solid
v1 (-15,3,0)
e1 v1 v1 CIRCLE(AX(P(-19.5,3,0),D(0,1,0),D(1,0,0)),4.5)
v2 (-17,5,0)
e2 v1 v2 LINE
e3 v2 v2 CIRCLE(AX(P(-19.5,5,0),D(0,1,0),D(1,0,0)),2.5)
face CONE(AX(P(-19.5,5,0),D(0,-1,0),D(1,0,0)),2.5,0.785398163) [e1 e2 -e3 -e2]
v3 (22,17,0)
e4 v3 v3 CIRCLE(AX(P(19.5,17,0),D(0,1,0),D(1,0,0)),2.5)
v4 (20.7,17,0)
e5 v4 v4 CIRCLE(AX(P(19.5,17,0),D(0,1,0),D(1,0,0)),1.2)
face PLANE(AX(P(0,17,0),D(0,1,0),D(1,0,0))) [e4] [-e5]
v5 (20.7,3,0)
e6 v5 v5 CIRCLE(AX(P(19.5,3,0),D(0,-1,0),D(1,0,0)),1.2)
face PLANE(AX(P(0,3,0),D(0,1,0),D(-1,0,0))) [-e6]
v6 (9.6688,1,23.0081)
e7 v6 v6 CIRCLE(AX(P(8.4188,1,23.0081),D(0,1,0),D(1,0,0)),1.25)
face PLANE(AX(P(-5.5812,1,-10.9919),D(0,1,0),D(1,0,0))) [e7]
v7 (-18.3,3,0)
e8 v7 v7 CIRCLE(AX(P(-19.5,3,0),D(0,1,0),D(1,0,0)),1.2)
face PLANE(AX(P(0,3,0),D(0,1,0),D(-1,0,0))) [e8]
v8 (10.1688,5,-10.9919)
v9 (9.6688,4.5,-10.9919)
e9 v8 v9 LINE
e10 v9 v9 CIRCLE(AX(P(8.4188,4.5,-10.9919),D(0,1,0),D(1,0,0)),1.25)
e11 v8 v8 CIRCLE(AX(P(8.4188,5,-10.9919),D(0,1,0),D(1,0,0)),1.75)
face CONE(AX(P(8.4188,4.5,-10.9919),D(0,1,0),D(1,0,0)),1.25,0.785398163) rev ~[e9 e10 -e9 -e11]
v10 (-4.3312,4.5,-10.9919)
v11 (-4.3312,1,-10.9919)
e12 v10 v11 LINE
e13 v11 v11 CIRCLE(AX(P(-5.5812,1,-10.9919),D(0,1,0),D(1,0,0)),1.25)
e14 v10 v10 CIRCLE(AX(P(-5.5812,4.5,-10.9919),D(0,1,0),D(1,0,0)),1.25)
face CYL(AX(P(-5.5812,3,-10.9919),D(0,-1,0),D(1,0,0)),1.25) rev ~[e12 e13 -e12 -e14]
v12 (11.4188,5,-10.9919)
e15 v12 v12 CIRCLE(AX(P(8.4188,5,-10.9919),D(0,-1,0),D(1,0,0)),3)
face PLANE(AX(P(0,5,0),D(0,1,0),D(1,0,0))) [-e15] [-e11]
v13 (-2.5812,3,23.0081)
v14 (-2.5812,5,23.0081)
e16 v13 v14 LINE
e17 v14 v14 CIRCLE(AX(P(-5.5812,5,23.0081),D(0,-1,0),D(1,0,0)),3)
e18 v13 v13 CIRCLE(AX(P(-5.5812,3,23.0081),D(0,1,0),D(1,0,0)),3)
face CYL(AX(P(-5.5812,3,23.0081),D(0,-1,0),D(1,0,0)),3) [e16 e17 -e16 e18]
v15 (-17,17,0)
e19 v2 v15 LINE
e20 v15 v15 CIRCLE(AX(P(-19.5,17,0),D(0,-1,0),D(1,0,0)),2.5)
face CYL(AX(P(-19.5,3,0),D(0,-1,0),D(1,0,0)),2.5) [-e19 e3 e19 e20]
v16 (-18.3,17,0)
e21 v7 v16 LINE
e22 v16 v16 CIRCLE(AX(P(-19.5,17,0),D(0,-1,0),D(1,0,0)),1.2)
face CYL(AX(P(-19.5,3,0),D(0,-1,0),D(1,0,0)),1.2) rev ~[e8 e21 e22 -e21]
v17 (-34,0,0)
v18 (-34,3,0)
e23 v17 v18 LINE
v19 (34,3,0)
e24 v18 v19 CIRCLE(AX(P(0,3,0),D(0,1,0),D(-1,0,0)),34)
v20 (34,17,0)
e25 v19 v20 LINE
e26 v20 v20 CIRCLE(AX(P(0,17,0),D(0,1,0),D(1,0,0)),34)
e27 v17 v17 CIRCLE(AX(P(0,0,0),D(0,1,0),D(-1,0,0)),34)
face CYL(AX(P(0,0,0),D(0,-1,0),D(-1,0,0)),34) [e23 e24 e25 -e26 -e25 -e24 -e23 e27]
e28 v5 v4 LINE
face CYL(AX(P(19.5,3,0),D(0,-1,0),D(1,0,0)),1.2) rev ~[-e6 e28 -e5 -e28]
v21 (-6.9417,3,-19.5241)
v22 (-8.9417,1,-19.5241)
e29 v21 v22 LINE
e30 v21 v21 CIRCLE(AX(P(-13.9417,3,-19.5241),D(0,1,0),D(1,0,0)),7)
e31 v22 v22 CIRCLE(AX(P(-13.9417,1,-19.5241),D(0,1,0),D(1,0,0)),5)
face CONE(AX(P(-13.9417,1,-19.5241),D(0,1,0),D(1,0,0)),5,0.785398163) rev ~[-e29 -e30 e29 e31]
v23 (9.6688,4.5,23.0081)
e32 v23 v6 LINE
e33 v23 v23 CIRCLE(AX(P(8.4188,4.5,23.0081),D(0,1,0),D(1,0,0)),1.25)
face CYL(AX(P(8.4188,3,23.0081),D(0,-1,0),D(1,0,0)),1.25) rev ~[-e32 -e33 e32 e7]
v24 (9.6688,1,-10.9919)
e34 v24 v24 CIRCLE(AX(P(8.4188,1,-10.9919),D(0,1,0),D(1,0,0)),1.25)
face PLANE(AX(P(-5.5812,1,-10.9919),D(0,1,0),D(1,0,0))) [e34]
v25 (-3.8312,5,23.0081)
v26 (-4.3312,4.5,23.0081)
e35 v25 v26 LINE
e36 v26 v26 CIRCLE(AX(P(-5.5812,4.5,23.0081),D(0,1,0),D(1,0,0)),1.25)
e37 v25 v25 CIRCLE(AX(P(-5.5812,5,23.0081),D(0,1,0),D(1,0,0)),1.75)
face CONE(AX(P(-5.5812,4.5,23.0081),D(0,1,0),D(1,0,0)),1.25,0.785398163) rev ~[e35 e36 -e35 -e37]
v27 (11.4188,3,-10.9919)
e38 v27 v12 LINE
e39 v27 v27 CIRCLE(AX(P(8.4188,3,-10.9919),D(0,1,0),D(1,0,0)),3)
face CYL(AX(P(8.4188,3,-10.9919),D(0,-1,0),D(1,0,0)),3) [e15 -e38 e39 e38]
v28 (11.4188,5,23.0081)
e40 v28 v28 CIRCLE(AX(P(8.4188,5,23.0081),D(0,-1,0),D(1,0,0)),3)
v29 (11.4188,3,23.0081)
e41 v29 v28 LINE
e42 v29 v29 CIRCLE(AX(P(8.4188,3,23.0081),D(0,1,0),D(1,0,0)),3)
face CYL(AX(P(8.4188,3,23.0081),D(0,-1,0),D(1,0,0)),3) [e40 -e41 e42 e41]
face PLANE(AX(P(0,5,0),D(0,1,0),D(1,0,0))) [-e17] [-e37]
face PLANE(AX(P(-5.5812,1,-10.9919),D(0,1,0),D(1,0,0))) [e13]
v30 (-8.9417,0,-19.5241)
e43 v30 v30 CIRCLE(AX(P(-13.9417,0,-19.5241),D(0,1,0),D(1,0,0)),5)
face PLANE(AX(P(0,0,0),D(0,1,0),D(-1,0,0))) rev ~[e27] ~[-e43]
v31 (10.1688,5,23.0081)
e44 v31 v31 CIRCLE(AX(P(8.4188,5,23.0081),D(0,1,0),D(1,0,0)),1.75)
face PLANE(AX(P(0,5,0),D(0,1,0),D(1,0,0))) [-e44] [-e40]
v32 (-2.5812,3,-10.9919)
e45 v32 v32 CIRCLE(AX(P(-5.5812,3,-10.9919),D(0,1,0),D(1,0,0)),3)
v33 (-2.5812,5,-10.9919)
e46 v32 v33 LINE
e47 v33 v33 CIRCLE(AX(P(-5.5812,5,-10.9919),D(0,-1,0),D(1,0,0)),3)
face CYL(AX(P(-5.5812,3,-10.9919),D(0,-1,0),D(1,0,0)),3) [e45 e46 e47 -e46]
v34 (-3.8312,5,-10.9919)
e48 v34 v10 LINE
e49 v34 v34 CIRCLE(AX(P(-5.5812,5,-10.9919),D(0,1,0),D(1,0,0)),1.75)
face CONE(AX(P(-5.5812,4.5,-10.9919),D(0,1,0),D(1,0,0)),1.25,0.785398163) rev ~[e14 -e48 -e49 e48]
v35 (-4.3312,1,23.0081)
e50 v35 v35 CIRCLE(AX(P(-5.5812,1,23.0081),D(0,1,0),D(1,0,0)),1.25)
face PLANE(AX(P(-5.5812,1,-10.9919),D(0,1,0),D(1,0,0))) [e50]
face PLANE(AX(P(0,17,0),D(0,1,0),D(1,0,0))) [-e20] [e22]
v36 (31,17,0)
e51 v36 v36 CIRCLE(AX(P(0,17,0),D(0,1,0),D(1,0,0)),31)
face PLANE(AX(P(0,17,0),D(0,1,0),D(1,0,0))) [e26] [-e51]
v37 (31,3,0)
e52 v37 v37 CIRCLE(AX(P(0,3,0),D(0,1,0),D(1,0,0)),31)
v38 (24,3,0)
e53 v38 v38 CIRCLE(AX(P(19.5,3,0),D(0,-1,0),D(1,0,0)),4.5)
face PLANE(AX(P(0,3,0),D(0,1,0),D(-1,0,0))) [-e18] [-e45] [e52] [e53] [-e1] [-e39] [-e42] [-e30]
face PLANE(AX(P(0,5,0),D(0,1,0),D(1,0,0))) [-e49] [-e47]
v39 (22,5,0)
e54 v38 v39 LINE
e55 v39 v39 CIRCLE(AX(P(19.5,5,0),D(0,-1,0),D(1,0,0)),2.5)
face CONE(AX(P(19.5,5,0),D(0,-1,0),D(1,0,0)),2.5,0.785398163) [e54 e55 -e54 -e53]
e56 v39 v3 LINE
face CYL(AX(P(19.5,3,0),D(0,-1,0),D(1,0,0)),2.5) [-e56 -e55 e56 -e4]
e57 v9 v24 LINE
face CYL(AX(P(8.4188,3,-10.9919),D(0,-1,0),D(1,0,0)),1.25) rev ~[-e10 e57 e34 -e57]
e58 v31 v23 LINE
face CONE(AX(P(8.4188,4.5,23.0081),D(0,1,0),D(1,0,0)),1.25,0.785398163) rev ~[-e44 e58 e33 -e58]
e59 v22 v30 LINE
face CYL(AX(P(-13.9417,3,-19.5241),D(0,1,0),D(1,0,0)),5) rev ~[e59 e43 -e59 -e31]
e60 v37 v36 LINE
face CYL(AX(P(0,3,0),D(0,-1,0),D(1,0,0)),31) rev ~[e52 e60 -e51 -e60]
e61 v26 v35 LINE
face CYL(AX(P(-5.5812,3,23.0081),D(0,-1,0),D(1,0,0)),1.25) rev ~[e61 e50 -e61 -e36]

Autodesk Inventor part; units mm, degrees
ref_plane "YZ Plane" through (0, 0, 0) normal (1, 0, 0) x (0, 1, 0)
ref_plane "XZ Plane" through (0, 0, 0) normal (0, 1, 0) x (-1, 0, 0)
ref_plane "XY Plane" through (0, 0, 0) normal (0, 0, 1) x (1, 0, 0)
sketch "Sketch1" plane through (0, 0, 0) normal (0, 1, 0) x (-1, 0, 0)
  circle A0 centre (0, 0) radius 34
  dimension "d0" = 68
extrude "Extrusion1" add sketch "Sketch1" along normal blind 3
sketch "Sketch2" plane through (0, 3, 0) normal (0, 1, 0) x (1, 0, 0)
  circle A0 centre (0, 0) radius 34 projected
  circle A1 centre (0, 0) radius 31
  dimension "d3" = 62
extrude "Extrusion2" add sketch "Sketch2" along normal blind 14
sketch "Sketch3" plane through (0, 3, 0) normal (0, 1, 0) x (1, 0, 0)
  circle A0 centre (0, 0) radius 31 projected
  circle A1 centre (0, 0) radius 19.5
  line L0 (-19.5, 0) -> (19.5, 0)
  circle A2 centre (-19.5, 0) radius 1.2
  circle A3 centre (-19.5, 0) radius 2.5
  circle A4 centre (19.5, 0) radius 1.2
  circle A5 centre (19.5, 0) radius 2.5
  dimension "d6" = 39
  dimension "d7" = 2.4
  dimension "d8" = 5
  dimension "d9" = 2.4
  dimension "d10" = 5
extrude "Extrusion3" add sketch "Sketch3" along normal up to surface (14 mm away) contours A4 L0 A5 A1 | A1 A5 A4 | A1 A5 L0 A4 | A3 L0 A2 A1 | A1 A2 A3 | A1 A2 L0 A3
chamfer "Chamfer1" distance 2 angle 45 2 edges at (-22, 3, 0) (17, 3, 0)
sketch "Sketch4" plane through (0, 3, 0) normal (0, 1, 0) x (1, 0, 0)
  circle A0 centre (-13.9417, 19.5241) radius 5
  dimension "d16" = 10
extrude "Extrusion4" cut sketch "Sketch4" against normal blind 14
chamfer "Chamfer2" distance 2 angle 45 1 edges at (-18.9417, 3, -19.5241)
sketch "Sketch5" plane through (0, 3, 0) normal (0, 1, 0) x (1, 0, 0)
  line L0 (-8.5812, 13.9919) -> (11.4188, 13.9919)
  line L1 (11.4188, 13.9919) -> (11.4188, -26.0081)
  line L2 (11.4188, -26.0081) -> (-8.5812, -26.0081)
  line L3 (-8.5812, -26.0081) -> (-8.5812, 13.9919)
  circle A0 centre (-5.5812, 10.9919) radius 1.25
  circle A1 centre (-5.5812, 10.9919) radius 3
  circle A2 centre (8.4188, 10.9919) radius 1.25
  circle A3 centre (8.4188, 10.9919) radius 3
  circle A4 centre (8.4188, -23.0081) radius 1.25
  circle A5 centre (8.4188, -23.0081) radius 3
  circle A6 centre (-5.5812, -23.0081) radius 1.25
  circle A7 centre (-5.5812, -23.0081) radius 3
  dimension "d22" = 20
  dimension "d23" = 40
  dimension "d24" = 2.5
  dimension "d25" = 6
  dimension "d26" = 2.5
  dimension "d27" = 6
  dimension "d28" = 2.5
  dimension "d29" = 6
  dimension "d30" = 2.5
  dimension "d31" = 6
  dimension "d32" = 3
  dimension "d33" = 3
  dimension "d34" = 3
  dimension "d35" = 3
  dimension "d36" = 3
  dimension "d37" = 3
  dimension "d38" = 3
  dimension "d39" = 3
extrude "Extrusion5" add sketch "Sketch5" along normal blind 2 contours A1 | A3 | A7 | A5
sketch "Sketch6" plane through (-5.5812, 3, -10.9919) normal (0, 1, 0) x (1, 0, 0)
  circle A0 centre (0, 0) radius 1.25 projected
  circle A1 centre (0, 0) radius 1.25 projected
  circle A2 centre (14, 0) radius 1.25 projected
  circle A3 centre (14, -34) radius 1.25 projected
  circle A4 centre (0, -34) radius 1.25 projected
  point P0 (5.5812, -10.9919)
extrude "Extrusion6" cut sketch "Sketch6" against normal blind 2
chamfer "Chamfer3" distance 0.5 angle 45 4 edges at (-6.8312, 5, -10.9919) (7.1688, 5, -10.9919) (-6.8312, 5, 23.0081) (7.1688, 5, 23.0081)
properties part number "obudowa - czujnik dymu"
